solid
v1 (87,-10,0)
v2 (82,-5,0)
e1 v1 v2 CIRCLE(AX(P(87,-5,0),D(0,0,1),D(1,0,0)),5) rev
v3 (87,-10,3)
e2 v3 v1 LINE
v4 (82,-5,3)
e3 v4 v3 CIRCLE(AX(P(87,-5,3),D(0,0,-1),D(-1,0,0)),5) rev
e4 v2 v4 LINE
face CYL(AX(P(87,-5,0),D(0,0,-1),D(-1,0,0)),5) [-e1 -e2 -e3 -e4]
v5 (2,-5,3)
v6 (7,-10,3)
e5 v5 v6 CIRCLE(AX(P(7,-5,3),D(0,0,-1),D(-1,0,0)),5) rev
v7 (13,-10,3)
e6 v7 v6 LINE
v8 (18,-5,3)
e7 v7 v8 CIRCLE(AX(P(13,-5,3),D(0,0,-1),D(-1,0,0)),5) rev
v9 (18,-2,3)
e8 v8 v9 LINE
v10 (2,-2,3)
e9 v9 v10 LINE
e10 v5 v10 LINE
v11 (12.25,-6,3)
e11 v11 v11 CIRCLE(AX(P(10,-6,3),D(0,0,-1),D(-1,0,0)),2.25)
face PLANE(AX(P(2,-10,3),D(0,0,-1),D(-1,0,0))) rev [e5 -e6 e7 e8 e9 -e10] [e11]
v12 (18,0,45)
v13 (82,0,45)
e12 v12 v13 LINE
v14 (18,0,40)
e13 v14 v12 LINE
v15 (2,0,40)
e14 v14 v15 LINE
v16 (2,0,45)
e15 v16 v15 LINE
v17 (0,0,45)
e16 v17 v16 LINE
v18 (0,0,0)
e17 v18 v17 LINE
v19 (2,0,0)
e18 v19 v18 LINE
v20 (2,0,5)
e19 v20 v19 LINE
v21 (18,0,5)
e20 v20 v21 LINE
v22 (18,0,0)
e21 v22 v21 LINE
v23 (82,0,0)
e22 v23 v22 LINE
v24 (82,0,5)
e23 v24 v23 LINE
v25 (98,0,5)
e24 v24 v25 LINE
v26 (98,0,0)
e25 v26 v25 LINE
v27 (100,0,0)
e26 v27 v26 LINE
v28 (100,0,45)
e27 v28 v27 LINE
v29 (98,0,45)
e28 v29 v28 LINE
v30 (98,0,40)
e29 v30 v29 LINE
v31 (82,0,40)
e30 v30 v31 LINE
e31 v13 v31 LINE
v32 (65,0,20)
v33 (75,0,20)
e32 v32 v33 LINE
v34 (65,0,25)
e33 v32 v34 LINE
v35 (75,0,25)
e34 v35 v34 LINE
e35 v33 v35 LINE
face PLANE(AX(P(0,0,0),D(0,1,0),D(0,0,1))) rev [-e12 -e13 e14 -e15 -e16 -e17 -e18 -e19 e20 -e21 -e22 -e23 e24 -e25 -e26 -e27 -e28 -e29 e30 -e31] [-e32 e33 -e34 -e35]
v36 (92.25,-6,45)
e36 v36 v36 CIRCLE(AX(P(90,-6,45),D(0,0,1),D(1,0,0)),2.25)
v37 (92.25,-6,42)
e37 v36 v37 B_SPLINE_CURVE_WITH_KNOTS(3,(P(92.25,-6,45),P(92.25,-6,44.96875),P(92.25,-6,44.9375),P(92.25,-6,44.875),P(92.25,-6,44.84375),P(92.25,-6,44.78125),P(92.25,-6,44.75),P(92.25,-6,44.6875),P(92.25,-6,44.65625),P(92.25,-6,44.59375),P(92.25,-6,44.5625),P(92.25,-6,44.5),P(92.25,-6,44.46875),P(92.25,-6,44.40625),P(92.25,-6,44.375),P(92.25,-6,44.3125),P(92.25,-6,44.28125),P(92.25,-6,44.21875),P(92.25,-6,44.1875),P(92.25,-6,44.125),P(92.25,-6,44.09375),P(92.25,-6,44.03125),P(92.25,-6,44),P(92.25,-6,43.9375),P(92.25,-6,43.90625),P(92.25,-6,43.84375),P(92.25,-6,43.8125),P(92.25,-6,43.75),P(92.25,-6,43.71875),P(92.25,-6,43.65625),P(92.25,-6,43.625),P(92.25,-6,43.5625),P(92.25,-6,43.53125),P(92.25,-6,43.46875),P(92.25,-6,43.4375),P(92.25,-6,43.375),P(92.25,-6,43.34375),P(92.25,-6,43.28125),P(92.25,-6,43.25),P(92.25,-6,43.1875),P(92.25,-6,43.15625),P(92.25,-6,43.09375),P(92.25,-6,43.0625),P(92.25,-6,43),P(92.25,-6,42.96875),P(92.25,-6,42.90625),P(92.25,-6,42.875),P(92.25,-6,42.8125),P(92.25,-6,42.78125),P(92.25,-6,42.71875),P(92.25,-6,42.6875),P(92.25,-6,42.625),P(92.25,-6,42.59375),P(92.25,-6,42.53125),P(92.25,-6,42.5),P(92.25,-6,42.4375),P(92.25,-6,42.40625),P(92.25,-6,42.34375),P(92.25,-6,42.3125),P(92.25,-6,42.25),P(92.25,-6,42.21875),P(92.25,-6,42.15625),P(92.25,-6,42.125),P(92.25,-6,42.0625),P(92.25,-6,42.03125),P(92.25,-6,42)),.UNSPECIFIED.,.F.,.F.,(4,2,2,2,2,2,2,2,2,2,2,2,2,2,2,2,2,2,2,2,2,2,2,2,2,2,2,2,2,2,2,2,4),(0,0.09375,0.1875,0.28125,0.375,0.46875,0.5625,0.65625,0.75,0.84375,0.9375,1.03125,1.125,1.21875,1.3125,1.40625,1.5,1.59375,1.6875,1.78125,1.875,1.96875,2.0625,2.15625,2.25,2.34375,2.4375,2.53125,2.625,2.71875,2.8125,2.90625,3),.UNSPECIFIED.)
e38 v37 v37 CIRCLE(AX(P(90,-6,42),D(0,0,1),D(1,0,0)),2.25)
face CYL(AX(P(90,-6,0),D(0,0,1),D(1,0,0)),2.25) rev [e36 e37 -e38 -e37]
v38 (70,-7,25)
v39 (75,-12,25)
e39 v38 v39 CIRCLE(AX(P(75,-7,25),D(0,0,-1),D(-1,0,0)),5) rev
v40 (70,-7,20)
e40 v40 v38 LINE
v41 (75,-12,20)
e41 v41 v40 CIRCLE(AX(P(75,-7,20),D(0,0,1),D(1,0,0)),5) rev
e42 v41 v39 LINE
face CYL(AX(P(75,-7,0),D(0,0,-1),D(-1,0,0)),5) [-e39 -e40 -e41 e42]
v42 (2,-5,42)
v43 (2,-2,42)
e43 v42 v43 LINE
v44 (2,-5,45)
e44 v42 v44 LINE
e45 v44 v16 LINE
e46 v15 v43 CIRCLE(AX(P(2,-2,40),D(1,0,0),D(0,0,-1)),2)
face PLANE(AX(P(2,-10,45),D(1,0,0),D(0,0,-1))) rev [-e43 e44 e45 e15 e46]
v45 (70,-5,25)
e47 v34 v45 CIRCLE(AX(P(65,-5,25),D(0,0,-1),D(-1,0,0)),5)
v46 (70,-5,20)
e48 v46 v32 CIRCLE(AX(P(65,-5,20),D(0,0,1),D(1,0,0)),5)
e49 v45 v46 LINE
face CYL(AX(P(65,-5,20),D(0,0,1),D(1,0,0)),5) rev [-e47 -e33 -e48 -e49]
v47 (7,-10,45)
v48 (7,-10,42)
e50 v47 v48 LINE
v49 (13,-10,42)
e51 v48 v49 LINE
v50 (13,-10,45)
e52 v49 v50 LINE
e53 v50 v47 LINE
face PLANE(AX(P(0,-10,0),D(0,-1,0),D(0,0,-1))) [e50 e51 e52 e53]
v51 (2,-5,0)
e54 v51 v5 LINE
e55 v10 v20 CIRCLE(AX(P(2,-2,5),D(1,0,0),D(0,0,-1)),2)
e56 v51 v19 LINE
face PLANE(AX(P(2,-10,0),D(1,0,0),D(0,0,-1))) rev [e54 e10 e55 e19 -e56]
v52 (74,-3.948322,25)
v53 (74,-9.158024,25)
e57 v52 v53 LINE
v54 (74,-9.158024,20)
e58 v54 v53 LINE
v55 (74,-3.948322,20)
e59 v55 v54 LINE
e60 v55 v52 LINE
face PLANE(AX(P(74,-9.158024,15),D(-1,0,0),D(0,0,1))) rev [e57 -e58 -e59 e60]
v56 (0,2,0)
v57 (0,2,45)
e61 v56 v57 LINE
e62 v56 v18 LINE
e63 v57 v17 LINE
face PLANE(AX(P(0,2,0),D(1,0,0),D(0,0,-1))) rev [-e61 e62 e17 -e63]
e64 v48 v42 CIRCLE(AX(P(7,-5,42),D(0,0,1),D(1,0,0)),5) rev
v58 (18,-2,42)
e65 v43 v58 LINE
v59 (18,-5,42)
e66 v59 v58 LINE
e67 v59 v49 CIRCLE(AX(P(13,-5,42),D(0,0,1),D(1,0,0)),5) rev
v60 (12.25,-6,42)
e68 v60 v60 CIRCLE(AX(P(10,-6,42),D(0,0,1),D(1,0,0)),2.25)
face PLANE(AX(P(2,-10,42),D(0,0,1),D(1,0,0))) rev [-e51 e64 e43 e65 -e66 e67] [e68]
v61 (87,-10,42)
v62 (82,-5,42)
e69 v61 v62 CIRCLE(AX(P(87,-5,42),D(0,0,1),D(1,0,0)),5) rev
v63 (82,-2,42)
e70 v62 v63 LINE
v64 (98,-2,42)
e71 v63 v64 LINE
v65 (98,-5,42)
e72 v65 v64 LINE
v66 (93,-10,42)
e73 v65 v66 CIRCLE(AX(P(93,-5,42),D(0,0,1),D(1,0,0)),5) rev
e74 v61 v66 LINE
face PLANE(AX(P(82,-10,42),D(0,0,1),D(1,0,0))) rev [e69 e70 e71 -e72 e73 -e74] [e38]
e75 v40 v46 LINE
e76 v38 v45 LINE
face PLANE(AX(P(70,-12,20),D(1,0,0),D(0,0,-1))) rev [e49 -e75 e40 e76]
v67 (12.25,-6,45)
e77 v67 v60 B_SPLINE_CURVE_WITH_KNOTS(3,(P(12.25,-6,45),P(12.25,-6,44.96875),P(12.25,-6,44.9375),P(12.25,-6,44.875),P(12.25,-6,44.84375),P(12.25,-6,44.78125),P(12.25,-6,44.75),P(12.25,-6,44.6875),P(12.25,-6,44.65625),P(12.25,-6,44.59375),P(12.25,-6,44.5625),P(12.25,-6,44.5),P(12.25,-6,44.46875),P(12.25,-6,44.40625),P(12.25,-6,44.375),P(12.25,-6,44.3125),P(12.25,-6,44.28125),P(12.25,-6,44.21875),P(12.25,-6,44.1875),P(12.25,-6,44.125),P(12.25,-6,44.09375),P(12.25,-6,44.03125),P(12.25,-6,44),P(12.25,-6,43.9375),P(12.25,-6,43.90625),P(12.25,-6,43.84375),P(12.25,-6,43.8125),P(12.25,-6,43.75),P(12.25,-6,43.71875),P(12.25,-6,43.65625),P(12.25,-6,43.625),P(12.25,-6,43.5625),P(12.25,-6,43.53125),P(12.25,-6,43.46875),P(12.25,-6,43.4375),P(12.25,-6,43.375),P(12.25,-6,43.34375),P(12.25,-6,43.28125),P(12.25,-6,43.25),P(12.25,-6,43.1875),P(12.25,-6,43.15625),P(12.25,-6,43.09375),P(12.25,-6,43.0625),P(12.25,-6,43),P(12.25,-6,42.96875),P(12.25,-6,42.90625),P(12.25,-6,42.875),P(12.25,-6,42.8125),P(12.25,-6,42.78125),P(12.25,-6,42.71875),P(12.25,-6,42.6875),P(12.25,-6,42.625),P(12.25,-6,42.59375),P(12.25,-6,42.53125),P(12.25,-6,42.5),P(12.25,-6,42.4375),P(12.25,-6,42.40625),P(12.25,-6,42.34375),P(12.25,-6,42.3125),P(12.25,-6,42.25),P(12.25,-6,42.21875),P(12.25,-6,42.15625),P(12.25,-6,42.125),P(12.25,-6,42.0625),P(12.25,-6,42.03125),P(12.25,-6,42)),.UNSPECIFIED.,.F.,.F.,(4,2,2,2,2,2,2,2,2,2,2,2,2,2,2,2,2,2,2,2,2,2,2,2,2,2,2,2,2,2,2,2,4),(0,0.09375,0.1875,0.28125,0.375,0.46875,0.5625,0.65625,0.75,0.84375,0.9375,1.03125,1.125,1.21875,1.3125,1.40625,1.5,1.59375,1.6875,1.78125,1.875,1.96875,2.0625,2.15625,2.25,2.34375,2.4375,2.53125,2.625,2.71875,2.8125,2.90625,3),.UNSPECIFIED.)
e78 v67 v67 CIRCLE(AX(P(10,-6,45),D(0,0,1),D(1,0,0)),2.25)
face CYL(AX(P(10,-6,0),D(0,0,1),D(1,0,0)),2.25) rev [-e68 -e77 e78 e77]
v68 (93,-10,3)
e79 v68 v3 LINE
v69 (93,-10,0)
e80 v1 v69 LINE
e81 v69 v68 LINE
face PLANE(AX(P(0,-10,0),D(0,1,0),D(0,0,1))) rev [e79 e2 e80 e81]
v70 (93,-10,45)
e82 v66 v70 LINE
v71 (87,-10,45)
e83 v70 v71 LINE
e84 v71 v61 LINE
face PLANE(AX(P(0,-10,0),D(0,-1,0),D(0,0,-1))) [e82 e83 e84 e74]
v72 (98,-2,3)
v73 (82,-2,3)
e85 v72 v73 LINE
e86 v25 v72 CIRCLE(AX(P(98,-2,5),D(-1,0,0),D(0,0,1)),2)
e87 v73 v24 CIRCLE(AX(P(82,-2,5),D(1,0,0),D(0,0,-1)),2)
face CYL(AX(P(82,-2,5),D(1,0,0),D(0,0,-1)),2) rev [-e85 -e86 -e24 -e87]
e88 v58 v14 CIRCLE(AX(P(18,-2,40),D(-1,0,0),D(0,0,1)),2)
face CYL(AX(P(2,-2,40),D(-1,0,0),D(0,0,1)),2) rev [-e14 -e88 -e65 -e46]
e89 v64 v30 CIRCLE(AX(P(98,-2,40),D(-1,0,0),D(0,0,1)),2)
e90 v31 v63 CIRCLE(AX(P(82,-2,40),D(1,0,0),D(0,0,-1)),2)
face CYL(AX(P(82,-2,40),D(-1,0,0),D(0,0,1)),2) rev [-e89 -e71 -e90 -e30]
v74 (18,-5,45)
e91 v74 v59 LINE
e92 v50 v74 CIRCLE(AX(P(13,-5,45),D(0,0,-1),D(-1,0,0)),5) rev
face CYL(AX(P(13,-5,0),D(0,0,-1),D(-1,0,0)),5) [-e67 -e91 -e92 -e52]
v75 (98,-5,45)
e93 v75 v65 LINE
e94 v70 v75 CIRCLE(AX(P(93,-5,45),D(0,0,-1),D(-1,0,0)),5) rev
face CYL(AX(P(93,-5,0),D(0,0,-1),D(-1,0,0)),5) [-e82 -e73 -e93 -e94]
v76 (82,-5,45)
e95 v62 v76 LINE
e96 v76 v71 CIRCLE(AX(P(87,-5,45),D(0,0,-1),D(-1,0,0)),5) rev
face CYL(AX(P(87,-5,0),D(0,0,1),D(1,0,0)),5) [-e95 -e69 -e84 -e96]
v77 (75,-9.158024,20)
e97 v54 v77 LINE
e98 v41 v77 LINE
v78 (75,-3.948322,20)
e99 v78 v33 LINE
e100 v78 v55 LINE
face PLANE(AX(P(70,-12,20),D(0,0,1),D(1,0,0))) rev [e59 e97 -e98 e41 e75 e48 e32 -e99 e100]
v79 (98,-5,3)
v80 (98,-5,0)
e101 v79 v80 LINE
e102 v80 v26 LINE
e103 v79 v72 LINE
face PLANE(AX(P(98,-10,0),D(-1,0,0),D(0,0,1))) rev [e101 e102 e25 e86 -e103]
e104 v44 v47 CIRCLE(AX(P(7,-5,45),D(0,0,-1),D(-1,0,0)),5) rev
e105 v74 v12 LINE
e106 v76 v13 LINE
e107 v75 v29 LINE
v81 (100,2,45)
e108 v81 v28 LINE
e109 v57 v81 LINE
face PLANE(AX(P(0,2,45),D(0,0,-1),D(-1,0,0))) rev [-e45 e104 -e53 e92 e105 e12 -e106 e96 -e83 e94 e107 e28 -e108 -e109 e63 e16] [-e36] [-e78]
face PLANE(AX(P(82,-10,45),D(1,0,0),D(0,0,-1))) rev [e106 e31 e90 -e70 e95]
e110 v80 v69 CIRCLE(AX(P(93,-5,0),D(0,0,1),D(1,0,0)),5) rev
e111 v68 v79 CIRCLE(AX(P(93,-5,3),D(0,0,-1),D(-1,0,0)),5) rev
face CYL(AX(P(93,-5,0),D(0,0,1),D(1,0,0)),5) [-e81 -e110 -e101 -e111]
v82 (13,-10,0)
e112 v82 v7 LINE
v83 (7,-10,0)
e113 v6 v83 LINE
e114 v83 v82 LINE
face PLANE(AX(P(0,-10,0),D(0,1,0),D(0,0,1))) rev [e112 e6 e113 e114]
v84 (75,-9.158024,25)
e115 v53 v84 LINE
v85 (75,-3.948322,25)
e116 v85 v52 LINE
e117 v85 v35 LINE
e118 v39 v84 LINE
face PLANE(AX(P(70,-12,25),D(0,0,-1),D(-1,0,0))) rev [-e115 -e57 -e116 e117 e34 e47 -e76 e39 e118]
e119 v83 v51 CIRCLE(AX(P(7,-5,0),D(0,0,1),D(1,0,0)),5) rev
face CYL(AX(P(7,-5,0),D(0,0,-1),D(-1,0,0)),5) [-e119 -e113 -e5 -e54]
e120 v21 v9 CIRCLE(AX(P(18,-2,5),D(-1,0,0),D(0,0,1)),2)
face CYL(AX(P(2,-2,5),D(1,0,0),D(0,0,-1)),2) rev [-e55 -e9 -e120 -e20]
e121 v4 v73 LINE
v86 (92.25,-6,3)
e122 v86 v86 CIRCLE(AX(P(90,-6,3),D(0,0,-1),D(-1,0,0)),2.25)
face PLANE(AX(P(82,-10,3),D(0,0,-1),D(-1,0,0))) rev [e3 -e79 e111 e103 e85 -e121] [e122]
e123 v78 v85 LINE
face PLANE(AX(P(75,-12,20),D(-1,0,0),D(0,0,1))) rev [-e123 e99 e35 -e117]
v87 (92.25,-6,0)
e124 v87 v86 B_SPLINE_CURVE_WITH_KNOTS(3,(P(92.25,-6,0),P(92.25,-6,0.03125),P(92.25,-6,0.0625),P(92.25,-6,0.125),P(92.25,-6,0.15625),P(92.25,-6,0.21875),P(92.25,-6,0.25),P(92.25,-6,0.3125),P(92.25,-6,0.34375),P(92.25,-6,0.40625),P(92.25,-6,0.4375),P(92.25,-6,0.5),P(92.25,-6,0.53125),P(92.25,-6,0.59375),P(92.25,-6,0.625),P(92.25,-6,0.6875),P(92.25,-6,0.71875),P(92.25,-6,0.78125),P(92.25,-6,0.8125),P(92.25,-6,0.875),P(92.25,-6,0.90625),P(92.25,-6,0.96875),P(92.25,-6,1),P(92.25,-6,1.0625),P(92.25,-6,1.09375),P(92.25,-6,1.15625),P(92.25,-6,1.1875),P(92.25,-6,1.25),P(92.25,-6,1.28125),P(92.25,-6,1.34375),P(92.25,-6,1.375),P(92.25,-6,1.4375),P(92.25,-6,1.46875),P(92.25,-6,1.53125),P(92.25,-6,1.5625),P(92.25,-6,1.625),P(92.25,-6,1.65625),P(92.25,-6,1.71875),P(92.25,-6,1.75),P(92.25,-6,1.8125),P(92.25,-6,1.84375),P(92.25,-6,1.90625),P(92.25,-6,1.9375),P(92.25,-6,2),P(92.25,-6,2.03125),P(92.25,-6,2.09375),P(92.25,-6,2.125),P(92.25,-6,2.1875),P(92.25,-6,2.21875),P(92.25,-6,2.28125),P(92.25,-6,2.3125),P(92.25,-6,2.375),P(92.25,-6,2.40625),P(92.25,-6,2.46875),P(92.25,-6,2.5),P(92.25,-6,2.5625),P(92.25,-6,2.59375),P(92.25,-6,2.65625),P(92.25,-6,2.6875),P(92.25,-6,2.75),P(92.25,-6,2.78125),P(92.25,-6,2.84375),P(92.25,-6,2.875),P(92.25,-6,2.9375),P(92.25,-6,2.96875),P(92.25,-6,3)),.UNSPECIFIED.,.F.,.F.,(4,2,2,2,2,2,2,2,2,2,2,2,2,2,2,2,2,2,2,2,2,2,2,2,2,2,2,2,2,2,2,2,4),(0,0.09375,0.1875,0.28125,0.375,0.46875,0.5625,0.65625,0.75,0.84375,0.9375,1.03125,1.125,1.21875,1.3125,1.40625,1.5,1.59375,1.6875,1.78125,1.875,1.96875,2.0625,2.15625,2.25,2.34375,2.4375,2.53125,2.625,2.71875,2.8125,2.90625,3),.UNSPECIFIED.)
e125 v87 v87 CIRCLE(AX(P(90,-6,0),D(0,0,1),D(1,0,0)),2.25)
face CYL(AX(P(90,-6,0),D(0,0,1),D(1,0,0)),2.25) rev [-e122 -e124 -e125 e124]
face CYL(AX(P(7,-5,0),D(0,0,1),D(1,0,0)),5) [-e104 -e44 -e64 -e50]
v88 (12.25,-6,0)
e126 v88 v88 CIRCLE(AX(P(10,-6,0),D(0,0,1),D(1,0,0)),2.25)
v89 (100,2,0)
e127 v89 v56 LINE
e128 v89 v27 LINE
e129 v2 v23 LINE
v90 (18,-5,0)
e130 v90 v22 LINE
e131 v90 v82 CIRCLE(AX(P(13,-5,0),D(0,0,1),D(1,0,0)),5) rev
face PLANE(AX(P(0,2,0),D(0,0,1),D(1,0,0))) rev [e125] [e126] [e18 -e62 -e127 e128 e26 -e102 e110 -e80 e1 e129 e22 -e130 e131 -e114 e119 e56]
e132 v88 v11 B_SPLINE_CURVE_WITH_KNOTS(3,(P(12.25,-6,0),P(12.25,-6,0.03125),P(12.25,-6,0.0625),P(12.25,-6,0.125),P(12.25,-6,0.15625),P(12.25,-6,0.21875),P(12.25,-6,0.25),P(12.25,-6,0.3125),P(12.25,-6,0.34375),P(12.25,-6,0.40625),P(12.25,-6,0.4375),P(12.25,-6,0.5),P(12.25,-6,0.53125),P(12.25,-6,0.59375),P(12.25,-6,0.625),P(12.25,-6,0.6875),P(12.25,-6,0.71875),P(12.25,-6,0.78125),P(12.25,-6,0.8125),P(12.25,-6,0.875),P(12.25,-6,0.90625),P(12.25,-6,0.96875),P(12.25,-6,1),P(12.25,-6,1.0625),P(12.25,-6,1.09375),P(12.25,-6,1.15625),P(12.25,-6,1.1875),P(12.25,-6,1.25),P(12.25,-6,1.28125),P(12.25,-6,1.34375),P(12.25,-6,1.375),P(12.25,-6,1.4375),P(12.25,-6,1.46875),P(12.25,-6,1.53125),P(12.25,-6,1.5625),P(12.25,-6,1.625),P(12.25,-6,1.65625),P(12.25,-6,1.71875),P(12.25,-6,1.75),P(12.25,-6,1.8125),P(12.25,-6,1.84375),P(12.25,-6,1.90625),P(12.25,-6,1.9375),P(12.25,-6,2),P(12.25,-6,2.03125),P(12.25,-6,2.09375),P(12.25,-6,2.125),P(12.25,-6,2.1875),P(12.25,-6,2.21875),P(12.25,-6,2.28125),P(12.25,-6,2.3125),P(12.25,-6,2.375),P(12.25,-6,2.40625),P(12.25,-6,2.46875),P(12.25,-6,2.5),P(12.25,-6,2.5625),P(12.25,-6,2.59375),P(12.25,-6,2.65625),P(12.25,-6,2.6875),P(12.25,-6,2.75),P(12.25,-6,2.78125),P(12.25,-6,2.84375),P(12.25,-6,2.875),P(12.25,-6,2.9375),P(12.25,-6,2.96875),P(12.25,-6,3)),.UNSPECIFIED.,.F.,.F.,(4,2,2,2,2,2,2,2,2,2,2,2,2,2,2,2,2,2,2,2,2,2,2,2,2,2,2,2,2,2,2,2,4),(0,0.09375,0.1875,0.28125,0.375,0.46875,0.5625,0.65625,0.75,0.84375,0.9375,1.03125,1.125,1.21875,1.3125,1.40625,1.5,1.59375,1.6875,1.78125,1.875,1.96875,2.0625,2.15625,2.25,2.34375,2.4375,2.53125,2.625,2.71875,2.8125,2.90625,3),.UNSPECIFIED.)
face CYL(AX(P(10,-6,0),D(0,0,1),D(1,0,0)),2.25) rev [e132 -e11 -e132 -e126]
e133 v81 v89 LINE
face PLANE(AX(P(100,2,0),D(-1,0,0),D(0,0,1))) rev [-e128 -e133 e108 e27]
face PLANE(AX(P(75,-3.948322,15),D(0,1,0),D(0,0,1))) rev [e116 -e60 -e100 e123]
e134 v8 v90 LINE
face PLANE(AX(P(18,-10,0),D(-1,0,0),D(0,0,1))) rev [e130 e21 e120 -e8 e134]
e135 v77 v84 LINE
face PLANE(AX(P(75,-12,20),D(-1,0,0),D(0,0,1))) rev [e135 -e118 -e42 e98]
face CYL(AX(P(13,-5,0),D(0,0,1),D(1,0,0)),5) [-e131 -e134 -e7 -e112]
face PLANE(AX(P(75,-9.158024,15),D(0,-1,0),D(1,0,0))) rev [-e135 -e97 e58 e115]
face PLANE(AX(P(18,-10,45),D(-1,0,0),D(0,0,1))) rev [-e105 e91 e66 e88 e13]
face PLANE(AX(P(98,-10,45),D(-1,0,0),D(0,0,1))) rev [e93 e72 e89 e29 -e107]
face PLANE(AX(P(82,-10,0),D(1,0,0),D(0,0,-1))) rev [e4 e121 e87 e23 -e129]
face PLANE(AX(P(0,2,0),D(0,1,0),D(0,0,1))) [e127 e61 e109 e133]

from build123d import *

# Parameters (mm, degrees)
SKETCH_1_W          = 100
SKETCH_1_H          = 45
EXTRUDE_1_DEPTH     = 2
SKETCH_2_W          = 16
SKETCH_2_H          = 3
EXTRUDE_2_DEPTH     = 10
SKETCH_3_R          = 2.25
CUT_EXTRUDE_1_DEPTH = 111.113577728
SKETCH_4_W          = 5
SKETCH_4_H          = 5
EXTRUDE_3_DEPTH     = 12
FILLET_1_R          = 5
FILLET_2_R          = 5
FILLET_3_R          = 2
SKETCH_5_W          = 1
SKETCH_5_H          = 5.209702161
CUT_EXTRUDE1_DEPTH  = 10


with BuildPart() as part:
    # 草图1 → 凸台-拉伸1 (new body)
    with BuildSketch(Plane(origin=(0, 0, 0), x_dir=(1, 0, 0), z_dir=(0, 1, 0))):
        with Locations((50, -22.5)):
            Rectangle(SKETCH_1_W, SKETCH_1_H)
    extrude(amount=EXTRUDE_1_DEPTH)

    # 草图2 → 凸台-拉伸2 (add)
    with BuildSketch(Plane(origin=(0, 0, 0), x_dir=(-1, 0, 0), z_dir=(0, -1, 0))):
        with Locations((-10, -43.5)):
            Rectangle(SKETCH_2_W, SKETCH_2_H)
        with Locations((-10, -1.5)):
            Rectangle(SKETCH_2_W, SKETCH_2_H)
        with Locations((-90, -43.5)):
            Rectangle(SKETCH_2_W, SKETCH_2_H)
        with Locations((-90, -1.5)):
            Rectangle(SKETCH_2_W, SKETCH_2_H)
    extrude(amount=EXTRUDE_2_DEPTH)

    # 草图3 → 切除-拉伸1 (cut, through all)
    with BuildSketch(Plane.XY.offset(45)):
        with Locations((90, -6)):
            Circle(SKETCH_3_R)
        with Locations((10, -6)):
            Circle(SKETCH_3_R)
    extrude(amount=-CUT_EXTRUDE_1_DEPTH, mode=Mode.SUBTRACT)

    # 草图4 → 凸台-拉伸3 (add)
    with BuildSketch(Plane(origin=(0, 0, 0), x_dir=(-1, 0, 0), z_dir=(0, -1, 0))):
        with Locations((-72.5, -22.5)):
            Rectangle(SKETCH_4_W, SKETCH_4_H)
    extrude(amount=EXTRUDE_3_DEPTH)

    # 圆角1
    fillet_1_edges = [part.edges().sort_by_distance(p)[0] for p in [
        (2, -10, 43.5),
        (18, -10, 43.5),
        (2, -10, 1.5),
        (18, -10, 1.5),
        (82, -10, 43.5),
        (98, -10, 43.5),
        (82, -10, 1.5),
        (98, -10, 1.5),
    ]]
    fillet(fillet_1_edges, radius=FILLET_1_R)

    # 圆角2
    fillet_2_edges = [part.edges().sort_by_distance(p)[0] for p in [
        (70, 0, 22.5),
    ]]
    fillet(fillet_2_edges, radius=FILLET_2_R)
    fillet_2_2_edges = [part.edges().sort_by_distance(p)[0] for p in [
        (70, -12, 22.5),
    ]]
    fillet(fillet_2_2_edges, radius=FILLET_2_R - 0.0001)  # a hair under: the kernel refuses the full size

    # 圆角3
    fillet_3_edges = [part.edges().sort_by_distance(p)[0] for p in [
        (10, 0, 42),
        (10, 0, 3),
        (90, 0, 42),
        (90, 0, 3),
    ]]
    fillet(fillet_3_edges, radius=FILLET_3_R)

    # 草图5 → Cut-Extrude1 (cut)
    with BuildSketch(Plane.XY.offset(25)):
        with Locations((74.5, -6.55317269)):
            Rectangle(SKETCH_5_W, SKETCH_5_H)
    extrude(amount=-CUT_EXTRUDE1_DEPTH, mode=Mode.SUBTRACT)


solid = part.part
